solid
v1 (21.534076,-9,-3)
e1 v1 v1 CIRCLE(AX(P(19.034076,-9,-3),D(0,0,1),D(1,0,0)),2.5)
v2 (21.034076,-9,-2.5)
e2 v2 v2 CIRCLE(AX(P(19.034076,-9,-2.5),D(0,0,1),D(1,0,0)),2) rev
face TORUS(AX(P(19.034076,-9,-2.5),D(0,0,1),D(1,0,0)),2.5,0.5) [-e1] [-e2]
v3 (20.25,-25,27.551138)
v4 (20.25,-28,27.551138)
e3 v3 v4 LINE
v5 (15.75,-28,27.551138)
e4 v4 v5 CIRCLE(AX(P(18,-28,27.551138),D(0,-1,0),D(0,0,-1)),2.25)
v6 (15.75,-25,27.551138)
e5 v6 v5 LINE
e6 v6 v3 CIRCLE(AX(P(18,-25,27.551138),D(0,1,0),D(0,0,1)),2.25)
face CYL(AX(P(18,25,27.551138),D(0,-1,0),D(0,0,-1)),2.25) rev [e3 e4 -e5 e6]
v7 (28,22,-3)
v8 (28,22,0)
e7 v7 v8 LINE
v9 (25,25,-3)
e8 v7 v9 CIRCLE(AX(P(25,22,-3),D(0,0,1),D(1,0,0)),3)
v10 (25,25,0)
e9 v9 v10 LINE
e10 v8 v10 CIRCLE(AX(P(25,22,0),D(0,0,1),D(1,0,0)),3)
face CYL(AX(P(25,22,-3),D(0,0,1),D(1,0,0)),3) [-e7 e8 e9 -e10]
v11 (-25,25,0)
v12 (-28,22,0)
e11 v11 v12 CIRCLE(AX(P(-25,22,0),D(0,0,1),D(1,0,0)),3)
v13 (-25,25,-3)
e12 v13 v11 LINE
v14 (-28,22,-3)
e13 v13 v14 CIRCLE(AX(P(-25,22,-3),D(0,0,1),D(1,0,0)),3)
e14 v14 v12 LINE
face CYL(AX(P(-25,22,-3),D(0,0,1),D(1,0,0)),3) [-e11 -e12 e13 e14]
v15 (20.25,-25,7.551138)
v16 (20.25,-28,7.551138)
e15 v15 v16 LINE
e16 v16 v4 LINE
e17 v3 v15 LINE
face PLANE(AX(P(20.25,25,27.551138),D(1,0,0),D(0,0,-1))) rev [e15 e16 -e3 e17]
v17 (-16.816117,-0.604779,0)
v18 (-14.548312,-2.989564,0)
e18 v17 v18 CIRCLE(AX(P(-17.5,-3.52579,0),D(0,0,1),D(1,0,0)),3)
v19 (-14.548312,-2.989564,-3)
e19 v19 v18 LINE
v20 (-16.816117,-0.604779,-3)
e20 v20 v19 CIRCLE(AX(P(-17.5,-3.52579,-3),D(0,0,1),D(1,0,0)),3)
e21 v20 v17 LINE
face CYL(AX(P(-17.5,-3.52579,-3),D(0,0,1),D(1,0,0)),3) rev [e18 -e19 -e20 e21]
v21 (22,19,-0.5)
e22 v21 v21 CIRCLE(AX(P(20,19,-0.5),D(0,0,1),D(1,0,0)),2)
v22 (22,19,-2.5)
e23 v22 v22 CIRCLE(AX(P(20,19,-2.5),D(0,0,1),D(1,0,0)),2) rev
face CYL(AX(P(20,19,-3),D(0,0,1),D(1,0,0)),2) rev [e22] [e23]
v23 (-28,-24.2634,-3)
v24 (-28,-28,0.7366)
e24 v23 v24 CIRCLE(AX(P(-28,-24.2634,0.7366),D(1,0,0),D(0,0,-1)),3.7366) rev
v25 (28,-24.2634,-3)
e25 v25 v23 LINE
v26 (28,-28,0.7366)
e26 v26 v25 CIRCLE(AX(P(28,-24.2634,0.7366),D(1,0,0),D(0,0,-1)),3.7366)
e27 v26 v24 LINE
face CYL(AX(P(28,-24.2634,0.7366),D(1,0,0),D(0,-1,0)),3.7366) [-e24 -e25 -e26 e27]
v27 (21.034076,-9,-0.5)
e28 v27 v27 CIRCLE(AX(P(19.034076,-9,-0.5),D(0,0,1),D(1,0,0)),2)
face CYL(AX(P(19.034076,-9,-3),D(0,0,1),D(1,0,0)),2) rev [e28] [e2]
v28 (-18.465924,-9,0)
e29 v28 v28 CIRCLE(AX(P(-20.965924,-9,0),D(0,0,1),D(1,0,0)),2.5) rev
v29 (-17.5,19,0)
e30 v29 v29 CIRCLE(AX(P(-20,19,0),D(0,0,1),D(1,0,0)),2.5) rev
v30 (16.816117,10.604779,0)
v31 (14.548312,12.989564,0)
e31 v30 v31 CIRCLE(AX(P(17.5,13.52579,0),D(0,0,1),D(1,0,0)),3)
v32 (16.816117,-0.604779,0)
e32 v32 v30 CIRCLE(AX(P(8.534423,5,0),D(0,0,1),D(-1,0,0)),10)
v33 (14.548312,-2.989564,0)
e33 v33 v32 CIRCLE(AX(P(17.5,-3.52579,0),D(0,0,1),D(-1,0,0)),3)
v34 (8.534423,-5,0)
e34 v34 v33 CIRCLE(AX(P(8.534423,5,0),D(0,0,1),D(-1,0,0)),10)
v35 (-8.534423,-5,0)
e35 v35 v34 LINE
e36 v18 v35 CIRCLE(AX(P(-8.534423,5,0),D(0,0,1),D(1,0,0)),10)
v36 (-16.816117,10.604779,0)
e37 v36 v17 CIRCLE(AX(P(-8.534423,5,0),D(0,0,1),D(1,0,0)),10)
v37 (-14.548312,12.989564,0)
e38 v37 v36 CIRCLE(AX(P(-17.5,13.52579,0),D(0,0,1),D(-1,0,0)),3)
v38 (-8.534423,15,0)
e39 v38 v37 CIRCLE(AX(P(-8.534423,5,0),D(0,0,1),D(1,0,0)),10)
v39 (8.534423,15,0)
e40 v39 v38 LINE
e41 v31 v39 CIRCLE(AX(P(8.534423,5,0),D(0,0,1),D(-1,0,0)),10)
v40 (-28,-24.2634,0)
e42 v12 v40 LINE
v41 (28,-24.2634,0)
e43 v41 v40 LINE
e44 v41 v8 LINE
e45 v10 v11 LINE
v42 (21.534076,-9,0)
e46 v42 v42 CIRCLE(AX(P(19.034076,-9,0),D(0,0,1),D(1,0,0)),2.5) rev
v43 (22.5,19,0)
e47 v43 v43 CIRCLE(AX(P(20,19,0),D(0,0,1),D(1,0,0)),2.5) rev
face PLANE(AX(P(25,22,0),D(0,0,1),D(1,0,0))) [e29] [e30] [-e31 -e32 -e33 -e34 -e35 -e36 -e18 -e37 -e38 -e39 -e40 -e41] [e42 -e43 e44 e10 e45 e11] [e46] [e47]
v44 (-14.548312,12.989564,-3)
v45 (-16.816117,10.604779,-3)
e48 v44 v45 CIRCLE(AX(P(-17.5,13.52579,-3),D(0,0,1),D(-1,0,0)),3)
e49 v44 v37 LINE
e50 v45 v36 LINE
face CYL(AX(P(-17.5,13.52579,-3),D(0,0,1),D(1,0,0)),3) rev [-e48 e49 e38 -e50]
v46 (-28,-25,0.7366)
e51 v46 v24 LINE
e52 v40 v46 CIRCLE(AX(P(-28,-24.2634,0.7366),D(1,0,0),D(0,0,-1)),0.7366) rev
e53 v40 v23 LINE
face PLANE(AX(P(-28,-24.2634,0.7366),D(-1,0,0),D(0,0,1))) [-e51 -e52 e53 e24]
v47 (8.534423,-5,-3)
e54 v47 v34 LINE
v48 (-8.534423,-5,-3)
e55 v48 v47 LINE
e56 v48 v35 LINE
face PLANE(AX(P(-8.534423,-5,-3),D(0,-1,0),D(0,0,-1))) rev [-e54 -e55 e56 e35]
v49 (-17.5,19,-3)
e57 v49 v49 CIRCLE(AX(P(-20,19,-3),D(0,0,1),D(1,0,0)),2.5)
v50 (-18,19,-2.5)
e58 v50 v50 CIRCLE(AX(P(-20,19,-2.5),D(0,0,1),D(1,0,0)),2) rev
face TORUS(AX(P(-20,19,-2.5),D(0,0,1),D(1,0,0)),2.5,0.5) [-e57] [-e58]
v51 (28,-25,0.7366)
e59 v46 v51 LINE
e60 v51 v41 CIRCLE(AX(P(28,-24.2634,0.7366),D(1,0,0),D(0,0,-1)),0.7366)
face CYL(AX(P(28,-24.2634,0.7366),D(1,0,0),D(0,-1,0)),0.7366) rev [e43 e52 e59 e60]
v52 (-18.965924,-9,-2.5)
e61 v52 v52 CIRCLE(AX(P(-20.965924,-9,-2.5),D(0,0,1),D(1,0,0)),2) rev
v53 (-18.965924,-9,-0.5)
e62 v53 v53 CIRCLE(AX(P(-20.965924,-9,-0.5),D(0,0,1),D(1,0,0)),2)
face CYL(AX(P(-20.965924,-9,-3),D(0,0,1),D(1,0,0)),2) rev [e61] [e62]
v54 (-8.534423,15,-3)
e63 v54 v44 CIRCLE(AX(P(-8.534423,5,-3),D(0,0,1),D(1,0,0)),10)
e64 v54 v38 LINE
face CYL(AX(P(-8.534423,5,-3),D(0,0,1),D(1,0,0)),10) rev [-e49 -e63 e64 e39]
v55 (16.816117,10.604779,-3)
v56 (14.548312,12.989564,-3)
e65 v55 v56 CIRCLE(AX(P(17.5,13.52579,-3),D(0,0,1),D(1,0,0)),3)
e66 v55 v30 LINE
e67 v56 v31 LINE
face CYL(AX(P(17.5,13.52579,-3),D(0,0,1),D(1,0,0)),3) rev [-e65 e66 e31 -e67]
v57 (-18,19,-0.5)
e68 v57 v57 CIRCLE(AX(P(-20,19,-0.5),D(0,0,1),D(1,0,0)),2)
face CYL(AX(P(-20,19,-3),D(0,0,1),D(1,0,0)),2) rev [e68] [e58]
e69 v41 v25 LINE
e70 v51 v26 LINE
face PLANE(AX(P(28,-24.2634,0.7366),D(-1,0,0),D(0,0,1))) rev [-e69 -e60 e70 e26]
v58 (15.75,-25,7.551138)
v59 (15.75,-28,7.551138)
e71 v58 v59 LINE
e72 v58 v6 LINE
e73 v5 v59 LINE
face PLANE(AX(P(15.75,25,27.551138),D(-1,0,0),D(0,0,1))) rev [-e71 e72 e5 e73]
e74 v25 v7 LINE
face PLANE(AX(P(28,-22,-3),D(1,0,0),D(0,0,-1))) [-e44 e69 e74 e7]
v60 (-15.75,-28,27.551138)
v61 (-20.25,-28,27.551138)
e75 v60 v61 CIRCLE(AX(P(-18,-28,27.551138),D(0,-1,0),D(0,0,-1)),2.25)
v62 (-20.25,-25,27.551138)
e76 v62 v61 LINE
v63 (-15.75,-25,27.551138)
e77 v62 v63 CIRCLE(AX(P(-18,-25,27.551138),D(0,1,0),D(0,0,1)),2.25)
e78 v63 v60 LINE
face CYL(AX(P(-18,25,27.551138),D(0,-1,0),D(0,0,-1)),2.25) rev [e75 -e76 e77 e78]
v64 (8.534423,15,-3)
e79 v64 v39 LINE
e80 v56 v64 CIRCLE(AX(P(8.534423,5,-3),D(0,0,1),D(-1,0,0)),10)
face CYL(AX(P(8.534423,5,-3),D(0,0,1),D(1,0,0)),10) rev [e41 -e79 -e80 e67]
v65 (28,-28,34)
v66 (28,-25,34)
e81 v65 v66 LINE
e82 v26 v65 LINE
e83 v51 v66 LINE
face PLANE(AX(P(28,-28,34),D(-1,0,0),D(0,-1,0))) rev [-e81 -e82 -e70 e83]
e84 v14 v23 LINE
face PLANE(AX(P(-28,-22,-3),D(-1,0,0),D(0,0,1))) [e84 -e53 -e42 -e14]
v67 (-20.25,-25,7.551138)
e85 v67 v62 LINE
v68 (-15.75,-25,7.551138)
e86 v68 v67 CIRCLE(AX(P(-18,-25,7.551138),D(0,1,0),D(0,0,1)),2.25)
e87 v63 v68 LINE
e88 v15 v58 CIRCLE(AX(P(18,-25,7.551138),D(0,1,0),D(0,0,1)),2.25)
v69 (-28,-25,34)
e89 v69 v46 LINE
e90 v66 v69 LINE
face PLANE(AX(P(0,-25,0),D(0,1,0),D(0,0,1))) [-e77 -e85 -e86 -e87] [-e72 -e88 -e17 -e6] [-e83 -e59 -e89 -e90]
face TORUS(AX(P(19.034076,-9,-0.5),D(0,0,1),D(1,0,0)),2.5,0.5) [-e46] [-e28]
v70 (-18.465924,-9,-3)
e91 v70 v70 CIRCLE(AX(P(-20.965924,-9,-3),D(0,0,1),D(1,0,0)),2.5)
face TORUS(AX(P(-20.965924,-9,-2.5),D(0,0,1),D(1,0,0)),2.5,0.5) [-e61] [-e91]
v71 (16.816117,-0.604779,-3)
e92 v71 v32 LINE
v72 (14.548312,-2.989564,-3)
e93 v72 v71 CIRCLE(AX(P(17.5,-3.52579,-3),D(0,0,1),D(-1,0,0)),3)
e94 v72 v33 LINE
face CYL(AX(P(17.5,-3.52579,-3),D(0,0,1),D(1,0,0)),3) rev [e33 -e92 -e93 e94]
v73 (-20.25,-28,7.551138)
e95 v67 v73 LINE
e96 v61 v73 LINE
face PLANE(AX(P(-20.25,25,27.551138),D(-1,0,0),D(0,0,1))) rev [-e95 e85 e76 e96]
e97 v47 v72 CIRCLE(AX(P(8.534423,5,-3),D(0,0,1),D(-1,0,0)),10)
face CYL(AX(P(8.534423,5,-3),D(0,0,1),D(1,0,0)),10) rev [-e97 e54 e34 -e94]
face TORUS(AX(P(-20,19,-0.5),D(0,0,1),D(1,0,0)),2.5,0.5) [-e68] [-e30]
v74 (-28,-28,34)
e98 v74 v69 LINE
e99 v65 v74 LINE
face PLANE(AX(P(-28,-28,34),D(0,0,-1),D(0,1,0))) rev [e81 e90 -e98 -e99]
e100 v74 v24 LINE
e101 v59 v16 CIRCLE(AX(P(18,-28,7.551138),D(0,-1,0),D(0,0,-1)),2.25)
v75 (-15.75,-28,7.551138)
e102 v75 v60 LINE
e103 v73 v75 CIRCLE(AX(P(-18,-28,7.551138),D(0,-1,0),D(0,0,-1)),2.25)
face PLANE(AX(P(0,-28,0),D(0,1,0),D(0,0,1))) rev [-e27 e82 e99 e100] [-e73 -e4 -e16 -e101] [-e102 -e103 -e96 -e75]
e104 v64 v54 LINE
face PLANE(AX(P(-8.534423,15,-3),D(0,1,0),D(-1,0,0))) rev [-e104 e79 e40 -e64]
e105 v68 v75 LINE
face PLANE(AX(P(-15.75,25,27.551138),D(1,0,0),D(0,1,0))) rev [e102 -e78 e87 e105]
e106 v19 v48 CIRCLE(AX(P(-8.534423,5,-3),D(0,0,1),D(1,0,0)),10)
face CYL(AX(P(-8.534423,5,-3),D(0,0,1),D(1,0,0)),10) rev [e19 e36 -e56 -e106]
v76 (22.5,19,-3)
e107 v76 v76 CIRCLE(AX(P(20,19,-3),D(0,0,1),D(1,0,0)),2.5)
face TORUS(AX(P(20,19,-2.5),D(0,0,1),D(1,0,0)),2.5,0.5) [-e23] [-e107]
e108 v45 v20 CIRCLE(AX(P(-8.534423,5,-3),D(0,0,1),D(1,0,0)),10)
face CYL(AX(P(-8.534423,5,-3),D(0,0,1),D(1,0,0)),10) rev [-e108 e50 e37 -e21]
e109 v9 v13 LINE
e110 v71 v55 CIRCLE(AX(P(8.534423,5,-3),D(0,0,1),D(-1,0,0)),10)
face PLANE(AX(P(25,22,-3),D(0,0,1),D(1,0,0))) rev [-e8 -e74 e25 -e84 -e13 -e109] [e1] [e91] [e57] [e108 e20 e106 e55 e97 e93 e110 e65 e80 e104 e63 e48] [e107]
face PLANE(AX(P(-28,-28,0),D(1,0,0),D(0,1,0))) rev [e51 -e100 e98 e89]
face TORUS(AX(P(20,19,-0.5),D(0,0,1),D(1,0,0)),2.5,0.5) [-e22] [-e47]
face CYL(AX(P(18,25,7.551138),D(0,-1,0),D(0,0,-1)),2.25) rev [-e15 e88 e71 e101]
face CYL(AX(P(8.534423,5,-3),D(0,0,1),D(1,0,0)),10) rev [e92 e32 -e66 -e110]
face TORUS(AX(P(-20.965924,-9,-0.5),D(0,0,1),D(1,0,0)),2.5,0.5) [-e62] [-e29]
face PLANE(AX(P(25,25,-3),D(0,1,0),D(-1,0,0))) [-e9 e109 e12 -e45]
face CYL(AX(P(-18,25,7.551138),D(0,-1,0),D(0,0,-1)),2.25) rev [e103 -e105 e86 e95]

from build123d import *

# Parameters (mm, degrees)
SKETCH_2_R                       = 2
SM_BASE_FLANGE_1_DEPTH           = 3
FILLET_4_R                       = 0.5
SM_EDGE_FLANGE_2_STRIP_W         = 13.4732
SM_EDGE_FLANGE_2_STRIP_H         = 3
SM_EDGE_FLANGE_2_STRIP_CUT_DEPTH = 56
SM_EDGE_FLANGE_2_DEPTH           = 56
CUT_EXTRUDE_1_DEPTH              = 69.912988616


# Sheet-metal steps are written as plain solids
with BuildPart() as part:
    # Sketch 2 → 基体-法兰1 (new body)
    with BuildSketch(Plane.XY):
        with BuildLine():
            Line((25, -25), (-25, -25))
            Line((-25, -25), (-28, -25))
            Line((-28, -25), (-28, -22))
            Line((-28, -22), (-28, 22))
            ThreePointArc((-28, 22), (-27.121320344, 24.121320344), (-25, 25))
            Line((-25, 25), (25, 25))
            ThreePointArc((25, 25), (27.121320344, 24.121320344), (28, 22))
            Line((28, 22), (28, -22))
            Line((28, -22), (28, -25))
            Line((28, -25), (25, -25))
        make_face()
        with Locations((-20, 19)):
            Circle(SKETCH_2_R, mode=Mode.SUBTRACT)
        with Locations(Location((20, 19, 0), (0, 0, 180))):
            Circle(SKETCH_2_R, mode=Mode.SUBTRACT)
        with Locations((-20.965924131, -9)):
            Circle(SKETCH_2_R, mode=Mode.SUBTRACT)
        with Locations((19.034075869, -9)):
            Circle(SKETCH_2_R, mode=Mode.SUBTRACT)
        with BuildLine():
            Line((-8.534422744, 15), (8.534422744, 15))
            ThreePointArc((8.534422744, 15), (11.704939866, 14.484082517), (14.548311944, 12.989564236))
            ThreePointArc((14.548311944, 12.989564236), (19.673969914, 15.593119942), (16.816116637, 10.604778877))
            ThreePointArc((16.816116637, 10.604778877), (18.534422744, 5), (16.816116637, -0.604778877))
            ThreePointArc((16.816116637, -0.604778877), (19.673969914, -5.593119942), (14.548311944, -2.989564236))
            ThreePointArc((14.548311944, -2.989564236), (11.704939866, -4.484082517), (8.534422744, -5))
            Line((8.534422744, -5), (-8.534422744, -5))
            ThreePointArc((-8.534422744, -5), (-11.704939866, -4.484082517), (-14.548311944, -2.989564236))
            ThreePointArc((-14.548311944, -2.989564236), (-19.673969914, -5.593119942), (-16.816116637, -0.604778877))
            ThreePointArc((-16.816116637, -0.604778877), (-18.534422744, 5), (-16.816116637, 10.604778877))
            ThreePointArc((-16.816116637, 10.604778877), (-19.673969914, 15.593119942), (-14.548311944, 12.989564236))
            ThreePointArc((-14.548311944, 12.989564236), (-11.704939866, 14.484082517), (-8.534422744, 15))
        make_face(mode=Mode.SUBTRACT)
    extrude(amount=-SM_BASE_FLANGE_1_DEPTH)

    # 圆角4
    fillet_4_edges = [part.edges().sort_by_distance(p)[0] for p in [
        (-22, 19, -3),
        (-22, 19, 0),
        (22, 19, -3),
        (22, 19, 0),
        (-22.965924131, -9, -3),
        (-22.965924131, -9, 0),
        (17.034075869, -9, -3),
        (17.034075869, -9, 0),
    ]]
    fillet(fillet_4_edges, radius=FILLET_4_R)

    # 边线-法兰2 strip (across the edge) → 边线-法兰2 strip cut (cut)
    with BuildSketch(Plane(origin=(-28, -25, 0), x_dir=(0, 1, 0), z_dir=(1, 0, 0))):
        with Locations((-6, -1.5)):
            Rectangle(SM_EDGE_FLANGE_2_STRIP_W, SM_EDGE_FLANGE_2_STRIP_H)
    extrude(amount=SM_EDGE_FLANGE_2_STRIP_CUT_DEPTH, mode=Mode.SUBTRACT)

    # 边线-法兰2 section (across the edge) → 边线-法兰2 (add)
    with BuildSketch(Plane(origin=(-28, -25, 0), x_dir=(0, 1, 0), z_dir=(1, 0, 0))):
        with BuildLine():
            Line((-3, 0.7366), (-3, 34))
            Line((-3, 34), (0, 34))
            Line((0, 34), (0, 0.7366))
            ThreePointArc((0, 0.7366), (0.215745145, 0.215745145), (0.7366, 0))
            Line((0.7366, 0), (0.7366, -3))
            ThreePointArc((0.7366, -3), (-1.905575199, -1.905575199), (-3, 0.7366))
        make_face()
    extrude(amount=SM_EDGE_FLANGE_2_DEPTH)

    # 草图6 → 切除-拉伸1 (cut, through all)
    with BuildSketch(Plane.XZ.offset(28)):
        with BuildLine():
            Line((-15.75, 27.551137587), (-15.75, 7.551137587))
            ThreePointArc((-15.75, 7.551137587), (-18, 5.301137587), (-20.25, 7.551137587))
            Line((-20.25, 7.551137587), (-20.25, 27.551137587))
            ThreePointArc((-20.25, 27.551137587), (-18, 29.801137587), (-15.75, 27.551137587))
        make_face()
        with BuildLine():
            Line((20.25, 27.551137587), (20.25, 7.551137587))
            ThreePointArc((20.25, 7.551137587), (18, 5.301137587), (15.75, 7.551137587))
            Line((15.75, 7.551137587), (15.75, 27.551137587))
            ThreePointArc((15.75, 27.551137587), (18, 29.801137587), (20.25, 27.551137587))
        make_face()
    extrude(amount=-CUT_EXTRUDE_1_DEPTH, mode=Mode.SUBTRACT)


solid = part.part
